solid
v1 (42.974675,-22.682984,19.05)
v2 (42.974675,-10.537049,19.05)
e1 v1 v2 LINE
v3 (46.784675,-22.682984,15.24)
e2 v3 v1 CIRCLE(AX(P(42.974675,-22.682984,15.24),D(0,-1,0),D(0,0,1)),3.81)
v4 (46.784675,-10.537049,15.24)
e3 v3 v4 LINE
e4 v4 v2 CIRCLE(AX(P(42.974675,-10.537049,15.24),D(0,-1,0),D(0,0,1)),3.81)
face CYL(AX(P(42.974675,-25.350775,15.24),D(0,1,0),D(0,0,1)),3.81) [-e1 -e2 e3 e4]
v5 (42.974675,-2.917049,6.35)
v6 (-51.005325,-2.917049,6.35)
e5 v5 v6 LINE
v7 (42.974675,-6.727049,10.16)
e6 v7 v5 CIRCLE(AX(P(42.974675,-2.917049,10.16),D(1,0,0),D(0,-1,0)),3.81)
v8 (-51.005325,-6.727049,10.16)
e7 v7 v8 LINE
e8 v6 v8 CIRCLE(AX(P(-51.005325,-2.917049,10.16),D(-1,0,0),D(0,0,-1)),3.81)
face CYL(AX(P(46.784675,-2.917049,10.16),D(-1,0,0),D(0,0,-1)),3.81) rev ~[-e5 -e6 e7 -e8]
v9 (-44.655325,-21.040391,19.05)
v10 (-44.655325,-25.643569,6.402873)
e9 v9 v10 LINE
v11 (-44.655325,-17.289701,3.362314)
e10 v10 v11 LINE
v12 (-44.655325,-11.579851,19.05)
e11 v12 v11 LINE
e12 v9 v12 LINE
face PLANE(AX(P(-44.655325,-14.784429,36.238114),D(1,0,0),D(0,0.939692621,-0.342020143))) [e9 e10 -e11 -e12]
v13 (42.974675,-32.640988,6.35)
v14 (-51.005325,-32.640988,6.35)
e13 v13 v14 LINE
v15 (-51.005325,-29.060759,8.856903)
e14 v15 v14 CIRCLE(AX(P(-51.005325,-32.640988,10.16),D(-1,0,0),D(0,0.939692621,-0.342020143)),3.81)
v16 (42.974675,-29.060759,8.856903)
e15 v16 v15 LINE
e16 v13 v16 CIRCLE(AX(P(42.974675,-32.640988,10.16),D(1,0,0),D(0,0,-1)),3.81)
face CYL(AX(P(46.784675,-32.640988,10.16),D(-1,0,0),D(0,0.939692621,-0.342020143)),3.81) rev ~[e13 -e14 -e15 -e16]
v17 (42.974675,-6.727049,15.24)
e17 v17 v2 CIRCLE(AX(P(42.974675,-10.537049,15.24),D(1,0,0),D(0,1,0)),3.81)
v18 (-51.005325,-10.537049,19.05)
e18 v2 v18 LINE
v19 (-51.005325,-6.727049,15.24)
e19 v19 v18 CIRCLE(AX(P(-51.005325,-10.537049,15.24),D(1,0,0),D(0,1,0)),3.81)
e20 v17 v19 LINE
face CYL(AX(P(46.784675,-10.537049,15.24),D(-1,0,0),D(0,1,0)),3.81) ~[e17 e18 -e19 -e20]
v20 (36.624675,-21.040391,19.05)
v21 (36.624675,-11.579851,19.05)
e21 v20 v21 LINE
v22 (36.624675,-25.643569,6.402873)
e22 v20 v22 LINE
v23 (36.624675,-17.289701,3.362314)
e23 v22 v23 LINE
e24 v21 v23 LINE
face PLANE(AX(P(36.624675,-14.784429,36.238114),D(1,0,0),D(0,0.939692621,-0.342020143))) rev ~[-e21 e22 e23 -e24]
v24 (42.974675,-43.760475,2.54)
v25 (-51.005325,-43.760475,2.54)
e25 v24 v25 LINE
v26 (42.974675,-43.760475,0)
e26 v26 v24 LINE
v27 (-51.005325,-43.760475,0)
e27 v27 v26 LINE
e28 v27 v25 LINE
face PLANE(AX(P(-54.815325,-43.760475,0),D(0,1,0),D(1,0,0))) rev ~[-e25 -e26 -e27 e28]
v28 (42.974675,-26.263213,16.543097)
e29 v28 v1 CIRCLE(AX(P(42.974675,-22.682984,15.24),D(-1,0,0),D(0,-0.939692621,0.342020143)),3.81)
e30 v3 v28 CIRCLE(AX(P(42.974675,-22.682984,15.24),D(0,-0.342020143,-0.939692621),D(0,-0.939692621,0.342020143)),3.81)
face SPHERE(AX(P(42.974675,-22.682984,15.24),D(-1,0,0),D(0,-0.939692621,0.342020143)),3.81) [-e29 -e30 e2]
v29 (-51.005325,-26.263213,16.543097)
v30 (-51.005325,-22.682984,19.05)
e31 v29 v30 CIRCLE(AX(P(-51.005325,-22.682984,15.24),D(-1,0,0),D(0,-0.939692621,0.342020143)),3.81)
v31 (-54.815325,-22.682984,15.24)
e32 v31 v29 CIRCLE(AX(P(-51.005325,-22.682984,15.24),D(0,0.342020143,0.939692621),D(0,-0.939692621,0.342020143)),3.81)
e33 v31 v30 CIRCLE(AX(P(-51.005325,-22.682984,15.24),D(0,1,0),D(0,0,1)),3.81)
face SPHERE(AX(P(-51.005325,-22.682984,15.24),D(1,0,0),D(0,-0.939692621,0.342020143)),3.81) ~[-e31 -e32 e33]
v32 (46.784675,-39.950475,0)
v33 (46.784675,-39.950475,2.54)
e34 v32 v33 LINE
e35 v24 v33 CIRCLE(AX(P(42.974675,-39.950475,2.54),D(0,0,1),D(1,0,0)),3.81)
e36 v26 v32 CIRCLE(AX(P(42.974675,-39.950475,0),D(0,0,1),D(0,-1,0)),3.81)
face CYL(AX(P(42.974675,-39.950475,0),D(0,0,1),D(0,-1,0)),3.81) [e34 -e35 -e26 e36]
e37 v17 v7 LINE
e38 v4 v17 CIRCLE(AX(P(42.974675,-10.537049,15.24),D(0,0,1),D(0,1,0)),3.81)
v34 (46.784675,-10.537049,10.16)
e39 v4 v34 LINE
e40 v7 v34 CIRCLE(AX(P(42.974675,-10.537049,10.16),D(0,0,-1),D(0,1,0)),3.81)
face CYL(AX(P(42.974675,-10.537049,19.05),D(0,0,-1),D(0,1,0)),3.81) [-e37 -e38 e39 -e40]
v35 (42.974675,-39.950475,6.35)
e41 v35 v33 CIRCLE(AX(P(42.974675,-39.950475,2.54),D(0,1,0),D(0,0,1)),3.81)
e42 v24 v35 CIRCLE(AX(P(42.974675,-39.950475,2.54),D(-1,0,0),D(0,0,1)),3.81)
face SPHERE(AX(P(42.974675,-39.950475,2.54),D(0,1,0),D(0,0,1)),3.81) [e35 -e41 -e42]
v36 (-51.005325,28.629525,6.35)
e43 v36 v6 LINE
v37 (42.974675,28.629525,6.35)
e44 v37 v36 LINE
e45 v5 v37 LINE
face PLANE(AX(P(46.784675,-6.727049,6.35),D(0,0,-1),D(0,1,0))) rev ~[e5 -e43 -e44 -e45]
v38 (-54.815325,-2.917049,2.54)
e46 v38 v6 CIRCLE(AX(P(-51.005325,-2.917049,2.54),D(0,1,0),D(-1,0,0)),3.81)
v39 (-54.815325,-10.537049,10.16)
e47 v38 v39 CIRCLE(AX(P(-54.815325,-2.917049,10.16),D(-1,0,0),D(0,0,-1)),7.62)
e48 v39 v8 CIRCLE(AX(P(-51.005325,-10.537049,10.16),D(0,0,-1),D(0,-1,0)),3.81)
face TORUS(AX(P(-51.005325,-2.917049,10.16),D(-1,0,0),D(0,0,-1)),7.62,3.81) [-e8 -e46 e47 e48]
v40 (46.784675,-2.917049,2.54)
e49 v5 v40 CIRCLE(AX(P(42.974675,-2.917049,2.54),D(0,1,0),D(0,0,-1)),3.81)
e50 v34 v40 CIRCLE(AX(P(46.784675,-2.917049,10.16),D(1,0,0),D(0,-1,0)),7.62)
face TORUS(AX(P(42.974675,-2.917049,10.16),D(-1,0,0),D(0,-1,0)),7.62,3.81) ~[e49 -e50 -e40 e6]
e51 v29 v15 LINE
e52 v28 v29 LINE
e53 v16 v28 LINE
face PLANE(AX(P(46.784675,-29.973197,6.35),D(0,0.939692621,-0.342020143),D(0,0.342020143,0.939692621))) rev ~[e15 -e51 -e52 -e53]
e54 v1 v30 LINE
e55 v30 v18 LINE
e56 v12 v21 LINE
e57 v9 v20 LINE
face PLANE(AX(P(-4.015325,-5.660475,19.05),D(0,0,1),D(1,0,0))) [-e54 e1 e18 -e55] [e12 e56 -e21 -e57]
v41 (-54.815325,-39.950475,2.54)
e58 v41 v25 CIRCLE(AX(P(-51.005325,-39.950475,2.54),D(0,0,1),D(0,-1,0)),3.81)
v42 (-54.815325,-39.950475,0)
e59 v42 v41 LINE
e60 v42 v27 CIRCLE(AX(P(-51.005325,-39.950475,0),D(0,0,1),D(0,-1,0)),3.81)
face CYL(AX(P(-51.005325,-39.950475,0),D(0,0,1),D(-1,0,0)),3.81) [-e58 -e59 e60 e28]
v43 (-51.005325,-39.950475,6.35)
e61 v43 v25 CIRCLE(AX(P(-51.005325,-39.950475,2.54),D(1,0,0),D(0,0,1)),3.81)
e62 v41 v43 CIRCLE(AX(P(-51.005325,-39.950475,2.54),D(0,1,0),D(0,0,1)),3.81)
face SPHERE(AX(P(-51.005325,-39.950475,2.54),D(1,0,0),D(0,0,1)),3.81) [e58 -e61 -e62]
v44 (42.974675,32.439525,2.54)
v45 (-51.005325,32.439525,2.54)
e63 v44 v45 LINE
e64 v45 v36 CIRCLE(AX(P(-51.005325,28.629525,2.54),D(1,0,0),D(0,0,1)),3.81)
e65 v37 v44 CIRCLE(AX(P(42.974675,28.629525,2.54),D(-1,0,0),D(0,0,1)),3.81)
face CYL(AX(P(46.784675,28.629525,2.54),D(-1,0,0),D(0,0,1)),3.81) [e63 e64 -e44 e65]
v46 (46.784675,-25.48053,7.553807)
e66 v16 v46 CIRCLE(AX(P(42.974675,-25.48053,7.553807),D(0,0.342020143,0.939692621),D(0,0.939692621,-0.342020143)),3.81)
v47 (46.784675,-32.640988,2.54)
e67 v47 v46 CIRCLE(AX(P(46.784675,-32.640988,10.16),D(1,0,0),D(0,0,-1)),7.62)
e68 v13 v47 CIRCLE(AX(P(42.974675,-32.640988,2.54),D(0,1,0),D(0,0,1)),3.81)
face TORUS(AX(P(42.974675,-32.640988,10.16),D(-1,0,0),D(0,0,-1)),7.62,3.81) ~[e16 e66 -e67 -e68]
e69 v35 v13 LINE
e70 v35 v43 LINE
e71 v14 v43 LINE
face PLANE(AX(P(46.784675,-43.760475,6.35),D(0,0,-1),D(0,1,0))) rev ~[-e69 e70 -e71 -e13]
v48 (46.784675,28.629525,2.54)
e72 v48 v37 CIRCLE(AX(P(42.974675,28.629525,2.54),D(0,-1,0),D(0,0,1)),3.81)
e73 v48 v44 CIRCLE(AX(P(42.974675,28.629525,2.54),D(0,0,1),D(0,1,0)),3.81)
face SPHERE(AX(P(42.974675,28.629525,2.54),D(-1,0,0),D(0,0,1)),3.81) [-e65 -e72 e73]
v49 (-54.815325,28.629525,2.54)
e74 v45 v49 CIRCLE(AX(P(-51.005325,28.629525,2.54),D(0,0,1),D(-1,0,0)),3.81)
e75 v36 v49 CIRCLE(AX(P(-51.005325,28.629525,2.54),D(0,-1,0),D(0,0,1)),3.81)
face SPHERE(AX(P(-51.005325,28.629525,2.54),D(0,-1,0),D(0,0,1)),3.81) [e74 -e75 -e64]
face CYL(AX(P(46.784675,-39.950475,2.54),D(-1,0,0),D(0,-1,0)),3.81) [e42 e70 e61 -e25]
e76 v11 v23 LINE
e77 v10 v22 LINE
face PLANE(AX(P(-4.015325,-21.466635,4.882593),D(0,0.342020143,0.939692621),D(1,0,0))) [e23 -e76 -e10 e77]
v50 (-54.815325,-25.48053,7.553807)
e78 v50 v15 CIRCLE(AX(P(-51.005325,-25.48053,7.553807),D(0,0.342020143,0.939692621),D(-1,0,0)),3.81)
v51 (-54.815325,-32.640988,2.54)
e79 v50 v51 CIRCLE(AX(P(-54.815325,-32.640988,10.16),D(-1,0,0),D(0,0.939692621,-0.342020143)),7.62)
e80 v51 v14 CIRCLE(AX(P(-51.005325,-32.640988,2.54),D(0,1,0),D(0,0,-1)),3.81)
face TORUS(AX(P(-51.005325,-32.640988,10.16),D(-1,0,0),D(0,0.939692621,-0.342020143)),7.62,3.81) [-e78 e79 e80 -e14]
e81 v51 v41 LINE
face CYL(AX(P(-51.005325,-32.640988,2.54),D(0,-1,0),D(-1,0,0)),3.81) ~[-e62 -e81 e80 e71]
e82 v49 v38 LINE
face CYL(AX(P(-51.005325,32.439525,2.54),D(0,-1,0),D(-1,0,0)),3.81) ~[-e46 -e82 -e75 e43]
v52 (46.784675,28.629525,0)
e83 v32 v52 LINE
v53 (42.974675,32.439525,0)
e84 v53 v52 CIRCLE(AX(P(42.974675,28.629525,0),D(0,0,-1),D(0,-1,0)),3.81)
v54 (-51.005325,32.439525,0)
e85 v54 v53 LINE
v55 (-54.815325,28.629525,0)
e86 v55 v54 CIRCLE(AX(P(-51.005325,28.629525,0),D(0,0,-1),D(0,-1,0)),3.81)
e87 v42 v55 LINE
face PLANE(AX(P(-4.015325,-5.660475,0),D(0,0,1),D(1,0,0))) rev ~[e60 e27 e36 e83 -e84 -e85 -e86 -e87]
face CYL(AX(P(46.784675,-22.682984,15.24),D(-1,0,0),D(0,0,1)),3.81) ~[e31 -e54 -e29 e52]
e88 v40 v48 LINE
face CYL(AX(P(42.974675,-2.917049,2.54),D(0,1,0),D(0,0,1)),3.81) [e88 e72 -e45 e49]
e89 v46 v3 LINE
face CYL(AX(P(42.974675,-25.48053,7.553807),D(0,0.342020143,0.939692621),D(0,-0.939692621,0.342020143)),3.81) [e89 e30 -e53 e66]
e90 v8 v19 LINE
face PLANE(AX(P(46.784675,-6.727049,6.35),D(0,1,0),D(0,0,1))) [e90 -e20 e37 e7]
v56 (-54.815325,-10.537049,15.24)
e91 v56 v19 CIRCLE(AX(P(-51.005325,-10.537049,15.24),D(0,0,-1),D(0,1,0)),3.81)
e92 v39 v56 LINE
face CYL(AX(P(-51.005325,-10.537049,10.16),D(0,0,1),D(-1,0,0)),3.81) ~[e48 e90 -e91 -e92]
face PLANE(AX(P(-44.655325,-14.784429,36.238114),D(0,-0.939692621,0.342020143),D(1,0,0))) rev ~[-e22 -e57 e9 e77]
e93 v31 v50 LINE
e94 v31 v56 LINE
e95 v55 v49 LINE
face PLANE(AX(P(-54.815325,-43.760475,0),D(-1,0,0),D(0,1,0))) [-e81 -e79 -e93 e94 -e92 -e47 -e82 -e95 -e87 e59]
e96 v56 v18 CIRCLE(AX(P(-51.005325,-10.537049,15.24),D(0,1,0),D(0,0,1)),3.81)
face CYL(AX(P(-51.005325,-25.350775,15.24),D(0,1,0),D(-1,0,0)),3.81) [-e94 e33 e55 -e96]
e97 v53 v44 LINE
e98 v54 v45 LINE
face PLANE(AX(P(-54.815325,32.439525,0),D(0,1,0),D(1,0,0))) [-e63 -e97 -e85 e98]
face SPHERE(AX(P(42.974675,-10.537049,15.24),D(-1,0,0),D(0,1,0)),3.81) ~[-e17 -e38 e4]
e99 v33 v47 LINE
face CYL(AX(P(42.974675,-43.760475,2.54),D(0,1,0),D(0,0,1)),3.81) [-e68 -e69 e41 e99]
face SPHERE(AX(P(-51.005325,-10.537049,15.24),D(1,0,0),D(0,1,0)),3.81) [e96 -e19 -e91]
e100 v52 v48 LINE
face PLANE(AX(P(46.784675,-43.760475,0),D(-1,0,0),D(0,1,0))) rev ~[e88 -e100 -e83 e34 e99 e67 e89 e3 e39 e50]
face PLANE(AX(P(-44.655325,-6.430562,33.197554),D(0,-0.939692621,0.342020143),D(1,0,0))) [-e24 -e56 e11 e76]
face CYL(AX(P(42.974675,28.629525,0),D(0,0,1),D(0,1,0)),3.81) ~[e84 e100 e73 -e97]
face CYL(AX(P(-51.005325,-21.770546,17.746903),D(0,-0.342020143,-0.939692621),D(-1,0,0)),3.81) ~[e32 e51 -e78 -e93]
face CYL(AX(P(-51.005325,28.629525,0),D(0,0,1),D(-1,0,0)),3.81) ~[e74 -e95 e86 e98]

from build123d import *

# Parameters (mm, degrees)
F0_W     = 101.6
F0_H     = 76.2
F1_DEPTH = 19.05
F3_W     = 81.28
F3_H     = 8.89
F4_DEPTH = 31.75
F5_W     = 39.1665739621
F5_H     = 12.7
F6_DEPTH = 101.601
F7_F1_R  = 3.81
F7_F2_R  = 3.81


with BuildPart() as f1:
    # F0 (on Top) → F1 (new body)
    with BuildSketch(Plane.XY):
        with Locations((-4.0153246373, -5.6604754616)):
            Rectangle(F0_W, F0_H)
    extrude(amount=F1_DEPTH)

    # F3 (on face) → F4 (cut)
    with BuildSketch(Plane(origin=(0, 9.9172554964, 27.2474355394), x_dir=(1, 0, 0), z_dir=(0, 0.3420201433, 0.9396926208))):
        with Locations((-4.0153246373, -21.8419839543)):
            Rectangle(F3_W, F3_H)
    extrude(amount=-F4_DEPTH, mode=Mode.SUBTRACT)

    # F5 (on face) → F6 (cut, through all)
    with BuildSketch(Plane.YZ.offset(46.7846753627)):
        Polygon((-29.9731970935, 6.35), (-25.3507751184, 19.05), (-43.7604754616, 19.05), (-43.7604754616, 6.35), align=None)
        with Locations((12.8562375574, 12.7)):
            Rectangle(F5_W, F5_H)
    extrude(amount=-F6_DEPTH, mode=Mode.SUBTRACT)

    # F7: fillet of radius 3.81 on 19 edges, made by hand

    # F7_f1
    f7_f1_edges = [f1.edges().sort_by_distance(p)[0] for p in [
        (-4.0153246373, -29.9731970935, 6.35),
        (-4.0153246373, -6.7270494237, 6.35),
    ]]
    fillet(f7_f1_edges, radius=F7_F1_R)

    # F7_f2
    f7_f2_edges = [f1.edges().sort_by_distance(p)[0] for p in [
        (-4.0153246373, -25.3507751184, 19.05),
        (-4.0153246373, -6.7270494237, 19.05),
        (46.7846753627, -38.2007316379, 6.35),
        (-4.0153246373, -43.7604754616, 6.35),
        (-54.8153246373, -38.2007316379, 6.35),
        (-54.8153246373, 14.7612375574, 6.35),
        (-4.0153246373, 32.4395245384, 6.35),
        (46.7846753627, 14.7612375574, 6.35),
        (46.7846753627, 32.4395245384, 3.175),
        (46.7846753627, -43.7604754616, 3.175),
        (-54.8153246373, -43.7604754616, 3.175),
        (-54.8153246373, -27.2057670236, 13.953451627),
        (-54.8153246373, -6.7270494237, 14.605),
        (46.7846753627, -27.2057670236, 13.953451627),
        (46.7846753627, -16.038912271, 19.05),
        (-54.8153246373, -16.038912271, 19.05),
        (-54.8153246373, 32.4395245384, 3.175),
        (46.7846753627, -30.4556615916, 7.0390307113),
        (-54.8153246373, -5.61112626, 7.4659231637),
        (-54.8153246373, -30.4556615916, 7.0390307113),
        (46.7846753627, -5.61112626, 7.4659231637),
    ]]
    fillet(f7_f2_edges, radius=F7_F2_R)


solid = f1.part
